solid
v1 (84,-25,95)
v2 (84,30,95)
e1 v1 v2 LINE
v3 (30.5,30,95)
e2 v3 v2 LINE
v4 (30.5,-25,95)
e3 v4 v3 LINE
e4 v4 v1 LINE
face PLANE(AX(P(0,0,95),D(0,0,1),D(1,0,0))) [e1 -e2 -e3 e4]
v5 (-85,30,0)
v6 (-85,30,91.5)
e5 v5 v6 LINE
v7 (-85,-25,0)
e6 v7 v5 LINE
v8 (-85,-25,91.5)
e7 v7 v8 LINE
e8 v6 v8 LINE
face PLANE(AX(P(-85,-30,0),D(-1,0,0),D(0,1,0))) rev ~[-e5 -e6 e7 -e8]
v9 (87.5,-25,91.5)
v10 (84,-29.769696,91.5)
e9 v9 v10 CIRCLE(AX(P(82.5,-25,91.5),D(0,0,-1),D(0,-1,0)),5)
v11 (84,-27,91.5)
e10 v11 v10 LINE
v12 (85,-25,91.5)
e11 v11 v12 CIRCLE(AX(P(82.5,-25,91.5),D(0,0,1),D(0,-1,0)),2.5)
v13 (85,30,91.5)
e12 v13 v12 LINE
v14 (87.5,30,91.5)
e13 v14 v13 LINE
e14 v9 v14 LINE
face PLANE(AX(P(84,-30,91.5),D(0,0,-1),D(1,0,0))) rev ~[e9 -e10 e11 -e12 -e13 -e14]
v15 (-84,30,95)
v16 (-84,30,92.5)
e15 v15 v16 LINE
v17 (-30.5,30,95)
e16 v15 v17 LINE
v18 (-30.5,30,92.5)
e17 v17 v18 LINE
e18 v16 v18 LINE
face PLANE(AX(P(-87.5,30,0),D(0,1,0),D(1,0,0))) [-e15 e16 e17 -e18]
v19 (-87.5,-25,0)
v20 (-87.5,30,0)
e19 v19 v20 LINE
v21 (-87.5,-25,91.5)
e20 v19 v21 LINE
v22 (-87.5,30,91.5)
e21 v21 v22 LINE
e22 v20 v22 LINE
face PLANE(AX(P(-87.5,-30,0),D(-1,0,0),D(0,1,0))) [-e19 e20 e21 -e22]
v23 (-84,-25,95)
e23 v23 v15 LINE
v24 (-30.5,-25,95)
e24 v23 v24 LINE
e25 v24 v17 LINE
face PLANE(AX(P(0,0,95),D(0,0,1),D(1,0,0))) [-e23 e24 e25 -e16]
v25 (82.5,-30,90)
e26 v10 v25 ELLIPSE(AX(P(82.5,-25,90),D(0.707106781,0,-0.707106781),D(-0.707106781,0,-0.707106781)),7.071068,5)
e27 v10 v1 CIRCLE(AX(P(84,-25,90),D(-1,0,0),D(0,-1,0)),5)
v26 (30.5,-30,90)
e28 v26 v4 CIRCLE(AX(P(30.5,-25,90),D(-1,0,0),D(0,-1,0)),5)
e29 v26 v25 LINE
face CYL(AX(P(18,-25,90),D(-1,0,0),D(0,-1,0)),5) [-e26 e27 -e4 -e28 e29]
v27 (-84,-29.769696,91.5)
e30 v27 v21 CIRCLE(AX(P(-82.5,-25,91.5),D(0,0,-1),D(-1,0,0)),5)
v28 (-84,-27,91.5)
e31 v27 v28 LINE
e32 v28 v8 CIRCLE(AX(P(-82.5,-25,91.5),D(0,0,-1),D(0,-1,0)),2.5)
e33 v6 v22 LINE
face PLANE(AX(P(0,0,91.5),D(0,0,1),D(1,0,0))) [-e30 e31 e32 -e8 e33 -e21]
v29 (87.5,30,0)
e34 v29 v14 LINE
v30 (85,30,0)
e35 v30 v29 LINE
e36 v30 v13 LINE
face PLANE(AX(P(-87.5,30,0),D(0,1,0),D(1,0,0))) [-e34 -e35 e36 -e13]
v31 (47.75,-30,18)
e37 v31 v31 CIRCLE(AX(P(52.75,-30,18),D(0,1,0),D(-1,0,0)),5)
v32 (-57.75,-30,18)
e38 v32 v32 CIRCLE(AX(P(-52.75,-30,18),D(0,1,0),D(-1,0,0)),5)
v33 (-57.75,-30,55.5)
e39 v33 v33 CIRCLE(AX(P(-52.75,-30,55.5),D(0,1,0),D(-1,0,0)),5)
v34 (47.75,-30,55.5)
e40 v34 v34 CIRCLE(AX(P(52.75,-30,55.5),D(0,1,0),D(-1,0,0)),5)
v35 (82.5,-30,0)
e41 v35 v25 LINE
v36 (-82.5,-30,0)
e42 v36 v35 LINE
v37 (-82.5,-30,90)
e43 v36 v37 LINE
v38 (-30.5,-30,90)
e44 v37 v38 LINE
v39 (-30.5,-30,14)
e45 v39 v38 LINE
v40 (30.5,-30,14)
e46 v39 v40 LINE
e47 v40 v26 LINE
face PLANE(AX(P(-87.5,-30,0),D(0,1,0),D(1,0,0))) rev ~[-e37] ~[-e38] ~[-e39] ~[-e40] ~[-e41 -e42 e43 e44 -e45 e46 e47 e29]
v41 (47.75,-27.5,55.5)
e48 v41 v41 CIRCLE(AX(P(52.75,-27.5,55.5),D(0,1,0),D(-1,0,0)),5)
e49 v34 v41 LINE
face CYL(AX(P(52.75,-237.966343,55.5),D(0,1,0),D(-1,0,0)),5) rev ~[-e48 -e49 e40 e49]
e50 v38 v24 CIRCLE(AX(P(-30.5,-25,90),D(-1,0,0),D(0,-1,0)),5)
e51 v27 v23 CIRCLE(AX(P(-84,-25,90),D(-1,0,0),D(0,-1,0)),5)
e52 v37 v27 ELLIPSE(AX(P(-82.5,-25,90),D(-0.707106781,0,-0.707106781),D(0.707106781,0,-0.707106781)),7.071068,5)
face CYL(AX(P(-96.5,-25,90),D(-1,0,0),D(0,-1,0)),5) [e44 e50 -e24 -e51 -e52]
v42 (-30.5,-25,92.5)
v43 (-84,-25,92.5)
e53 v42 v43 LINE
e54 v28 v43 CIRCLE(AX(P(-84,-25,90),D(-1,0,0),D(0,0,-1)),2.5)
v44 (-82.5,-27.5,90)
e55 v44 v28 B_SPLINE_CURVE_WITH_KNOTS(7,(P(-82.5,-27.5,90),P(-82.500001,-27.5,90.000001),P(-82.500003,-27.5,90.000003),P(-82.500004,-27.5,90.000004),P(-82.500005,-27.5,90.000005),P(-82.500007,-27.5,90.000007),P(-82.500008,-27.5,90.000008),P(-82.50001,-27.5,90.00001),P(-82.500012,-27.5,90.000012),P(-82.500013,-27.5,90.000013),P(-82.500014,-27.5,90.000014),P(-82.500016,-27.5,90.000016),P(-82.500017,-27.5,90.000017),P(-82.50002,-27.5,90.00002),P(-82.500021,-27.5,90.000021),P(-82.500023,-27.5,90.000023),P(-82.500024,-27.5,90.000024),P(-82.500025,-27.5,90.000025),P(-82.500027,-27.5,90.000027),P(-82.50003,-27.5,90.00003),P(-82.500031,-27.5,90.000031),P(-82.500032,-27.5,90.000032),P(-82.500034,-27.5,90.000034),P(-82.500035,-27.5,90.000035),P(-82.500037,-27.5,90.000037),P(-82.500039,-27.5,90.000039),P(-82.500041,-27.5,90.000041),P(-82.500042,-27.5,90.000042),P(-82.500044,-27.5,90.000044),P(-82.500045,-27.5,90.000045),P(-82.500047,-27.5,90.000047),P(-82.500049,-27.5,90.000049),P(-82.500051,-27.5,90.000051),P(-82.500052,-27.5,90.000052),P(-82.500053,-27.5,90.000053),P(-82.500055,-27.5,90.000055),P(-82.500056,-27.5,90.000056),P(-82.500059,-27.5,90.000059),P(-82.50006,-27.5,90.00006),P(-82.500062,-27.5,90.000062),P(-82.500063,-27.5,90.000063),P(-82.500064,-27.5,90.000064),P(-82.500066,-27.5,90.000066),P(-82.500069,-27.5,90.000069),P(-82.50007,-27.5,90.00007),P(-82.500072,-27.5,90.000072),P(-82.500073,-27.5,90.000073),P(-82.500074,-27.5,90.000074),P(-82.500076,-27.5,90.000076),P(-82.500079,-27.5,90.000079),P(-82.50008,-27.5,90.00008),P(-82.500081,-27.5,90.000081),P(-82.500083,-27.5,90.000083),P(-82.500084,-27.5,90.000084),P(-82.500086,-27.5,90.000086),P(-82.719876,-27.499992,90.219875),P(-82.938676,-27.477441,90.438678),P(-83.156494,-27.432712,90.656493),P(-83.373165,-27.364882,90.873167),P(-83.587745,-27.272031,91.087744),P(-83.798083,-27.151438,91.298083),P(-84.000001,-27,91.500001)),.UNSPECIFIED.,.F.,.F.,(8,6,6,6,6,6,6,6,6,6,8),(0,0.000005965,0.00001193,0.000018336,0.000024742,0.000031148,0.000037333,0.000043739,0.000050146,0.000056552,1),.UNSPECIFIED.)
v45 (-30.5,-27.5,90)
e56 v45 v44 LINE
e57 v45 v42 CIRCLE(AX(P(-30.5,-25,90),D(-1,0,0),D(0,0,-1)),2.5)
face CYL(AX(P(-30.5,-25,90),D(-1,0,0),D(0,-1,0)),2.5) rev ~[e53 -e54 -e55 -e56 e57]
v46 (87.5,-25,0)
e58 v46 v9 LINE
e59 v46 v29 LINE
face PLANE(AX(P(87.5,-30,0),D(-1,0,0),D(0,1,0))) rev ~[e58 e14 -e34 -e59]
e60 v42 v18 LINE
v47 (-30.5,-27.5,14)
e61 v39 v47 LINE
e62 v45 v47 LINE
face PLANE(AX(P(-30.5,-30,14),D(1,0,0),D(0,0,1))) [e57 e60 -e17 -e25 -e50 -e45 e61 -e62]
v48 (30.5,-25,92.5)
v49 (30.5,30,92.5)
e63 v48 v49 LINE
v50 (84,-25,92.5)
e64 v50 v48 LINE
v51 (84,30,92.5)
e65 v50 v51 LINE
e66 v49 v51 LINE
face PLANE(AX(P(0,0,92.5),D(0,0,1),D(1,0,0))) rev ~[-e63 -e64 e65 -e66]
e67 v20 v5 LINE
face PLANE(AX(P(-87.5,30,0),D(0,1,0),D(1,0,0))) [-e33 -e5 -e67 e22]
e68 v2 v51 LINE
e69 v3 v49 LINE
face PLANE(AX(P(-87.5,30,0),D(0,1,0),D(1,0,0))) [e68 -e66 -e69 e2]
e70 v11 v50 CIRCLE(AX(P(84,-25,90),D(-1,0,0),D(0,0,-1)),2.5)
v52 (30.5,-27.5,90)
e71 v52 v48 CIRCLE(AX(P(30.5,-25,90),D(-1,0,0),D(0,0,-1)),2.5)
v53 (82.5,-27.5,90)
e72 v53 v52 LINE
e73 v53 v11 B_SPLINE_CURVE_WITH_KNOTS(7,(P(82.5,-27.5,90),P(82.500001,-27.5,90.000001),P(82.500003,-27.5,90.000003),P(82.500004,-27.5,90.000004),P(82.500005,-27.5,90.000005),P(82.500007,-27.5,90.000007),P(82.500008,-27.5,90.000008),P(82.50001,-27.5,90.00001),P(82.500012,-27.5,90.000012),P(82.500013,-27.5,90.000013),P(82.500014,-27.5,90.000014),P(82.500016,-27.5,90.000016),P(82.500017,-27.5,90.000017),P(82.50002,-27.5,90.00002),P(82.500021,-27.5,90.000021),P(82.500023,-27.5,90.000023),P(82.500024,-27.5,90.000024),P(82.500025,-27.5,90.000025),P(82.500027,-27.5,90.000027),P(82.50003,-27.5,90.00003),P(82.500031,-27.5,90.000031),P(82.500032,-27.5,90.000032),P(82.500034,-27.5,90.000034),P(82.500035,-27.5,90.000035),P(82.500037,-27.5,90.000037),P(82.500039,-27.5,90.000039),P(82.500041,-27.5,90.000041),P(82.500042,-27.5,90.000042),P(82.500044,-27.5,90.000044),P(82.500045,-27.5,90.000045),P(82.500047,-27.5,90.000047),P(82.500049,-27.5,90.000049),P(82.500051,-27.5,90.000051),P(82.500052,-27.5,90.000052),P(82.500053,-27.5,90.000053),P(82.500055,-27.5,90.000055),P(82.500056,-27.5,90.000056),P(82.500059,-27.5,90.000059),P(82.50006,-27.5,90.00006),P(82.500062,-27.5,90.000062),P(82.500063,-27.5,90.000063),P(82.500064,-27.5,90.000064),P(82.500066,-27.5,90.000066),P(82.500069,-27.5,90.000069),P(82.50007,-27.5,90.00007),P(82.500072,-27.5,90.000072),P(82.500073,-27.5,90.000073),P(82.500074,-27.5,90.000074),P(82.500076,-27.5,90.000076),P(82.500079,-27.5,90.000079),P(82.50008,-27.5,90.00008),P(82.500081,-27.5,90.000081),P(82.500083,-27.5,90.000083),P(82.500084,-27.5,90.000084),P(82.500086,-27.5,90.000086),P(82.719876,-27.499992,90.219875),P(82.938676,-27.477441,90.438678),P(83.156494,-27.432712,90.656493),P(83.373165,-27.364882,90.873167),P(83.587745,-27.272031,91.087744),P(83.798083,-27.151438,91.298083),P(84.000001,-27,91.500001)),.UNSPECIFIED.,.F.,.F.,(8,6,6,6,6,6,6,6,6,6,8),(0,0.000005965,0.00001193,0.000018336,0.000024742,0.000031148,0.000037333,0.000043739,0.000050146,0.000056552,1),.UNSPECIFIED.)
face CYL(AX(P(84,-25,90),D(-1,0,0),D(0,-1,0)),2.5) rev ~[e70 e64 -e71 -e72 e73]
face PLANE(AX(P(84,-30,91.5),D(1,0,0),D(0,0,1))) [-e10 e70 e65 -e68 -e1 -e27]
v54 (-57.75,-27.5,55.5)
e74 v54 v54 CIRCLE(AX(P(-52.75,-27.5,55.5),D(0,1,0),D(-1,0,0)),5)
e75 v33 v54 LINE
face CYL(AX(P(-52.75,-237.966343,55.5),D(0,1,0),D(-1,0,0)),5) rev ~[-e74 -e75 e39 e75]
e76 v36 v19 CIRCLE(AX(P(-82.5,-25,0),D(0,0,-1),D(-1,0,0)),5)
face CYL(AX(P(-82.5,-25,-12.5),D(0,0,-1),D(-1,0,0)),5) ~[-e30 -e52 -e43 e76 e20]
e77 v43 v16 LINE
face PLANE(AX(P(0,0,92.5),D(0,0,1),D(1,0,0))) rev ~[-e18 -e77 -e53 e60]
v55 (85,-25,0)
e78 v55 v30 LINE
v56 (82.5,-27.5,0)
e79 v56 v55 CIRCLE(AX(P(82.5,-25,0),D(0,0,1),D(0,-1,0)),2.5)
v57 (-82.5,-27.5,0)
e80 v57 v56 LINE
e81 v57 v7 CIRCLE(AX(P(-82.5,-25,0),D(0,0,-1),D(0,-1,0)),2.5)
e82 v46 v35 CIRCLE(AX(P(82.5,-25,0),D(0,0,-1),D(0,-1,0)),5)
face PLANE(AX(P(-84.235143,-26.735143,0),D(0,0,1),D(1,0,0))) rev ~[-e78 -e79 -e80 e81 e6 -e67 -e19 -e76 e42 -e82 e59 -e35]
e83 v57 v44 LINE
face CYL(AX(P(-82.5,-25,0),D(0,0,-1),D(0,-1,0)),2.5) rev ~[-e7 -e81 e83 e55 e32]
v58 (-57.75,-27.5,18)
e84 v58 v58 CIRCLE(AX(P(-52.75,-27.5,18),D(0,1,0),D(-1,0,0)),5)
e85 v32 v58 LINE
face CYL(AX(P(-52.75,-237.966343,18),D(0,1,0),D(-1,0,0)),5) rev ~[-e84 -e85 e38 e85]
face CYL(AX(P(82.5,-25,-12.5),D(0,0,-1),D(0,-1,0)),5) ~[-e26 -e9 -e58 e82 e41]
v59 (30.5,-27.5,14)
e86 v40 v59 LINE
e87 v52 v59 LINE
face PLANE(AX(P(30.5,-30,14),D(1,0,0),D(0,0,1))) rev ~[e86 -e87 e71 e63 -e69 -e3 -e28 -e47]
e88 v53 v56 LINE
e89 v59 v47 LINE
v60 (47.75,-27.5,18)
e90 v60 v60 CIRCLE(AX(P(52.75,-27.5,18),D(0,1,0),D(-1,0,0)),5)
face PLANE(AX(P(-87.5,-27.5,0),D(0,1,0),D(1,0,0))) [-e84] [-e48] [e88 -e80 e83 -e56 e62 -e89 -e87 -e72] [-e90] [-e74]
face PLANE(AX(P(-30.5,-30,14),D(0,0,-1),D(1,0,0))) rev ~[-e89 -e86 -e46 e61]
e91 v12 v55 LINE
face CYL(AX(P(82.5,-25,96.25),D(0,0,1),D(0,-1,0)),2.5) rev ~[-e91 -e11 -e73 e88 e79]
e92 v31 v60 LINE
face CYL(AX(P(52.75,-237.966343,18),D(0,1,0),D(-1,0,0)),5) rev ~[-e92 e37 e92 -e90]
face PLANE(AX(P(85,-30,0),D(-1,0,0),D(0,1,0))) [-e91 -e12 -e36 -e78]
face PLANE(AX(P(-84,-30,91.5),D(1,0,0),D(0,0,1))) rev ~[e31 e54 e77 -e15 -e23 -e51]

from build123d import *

# Parameters (mm, degrees)
F0_W         = 175
F0_H         = 60
F1_DEPTH     = 95
F3_T         = -2.5
F2_W         = 61
F2_H         = 81
F4_DEPTH     = 60.001
F6_D         = 10
F7_W         = 3.5
F7_H         = 3.5
F8_DEPTH     = 60.001
F9_T1_DEPTH  = 116.5
F9_T3_DEPTH  = 78.5
F9_T5_DEPTH  = 78.5
F10_R        = 2.5
F11_T4_DEPTH = 96.25
F12_R        = 2.5
F13_T4_DEPTH = 96.25


# Not quite as in the source:
# - a fillet or chamfer that OpenCascade refuses, or shapes differently, is made with other operations: its cross-section is extruded or revolved along the edge and cut away or added


with BuildPart() as f1:
    # F0 (on Top) → F1 (new body)
    with BuildSketch(Plane.XY):
        Rectangle(F0_W, F0_H)
    extrude(amount=F1_DEPTH)

    # F3
    f3_openings = [f1.faces().sort_by_distance(p)[0] for p in [
        (0, 30, 47.5),
        (0, 0, 0),
    ]]
    offset(amount=F3_T, openings=f3_openings)

    # F2 (on face) → F4 (cut, through all)
    with BuildSketch(Plane.XZ.offset(30)):
        with Locations((0, 54.5)):
            Rectangle(F2_W, F2_H)
    extrude(amount=-F4_DEPTH, mode=Mode.SUBTRACT)

    # F6 (through all)
    with Locations(Plane.XZ.offset(30)):
        with Locations((52.75, 55.5), (52.75, 18), (-52.75, 18), (-52.75, 55.5)):
            Hole(F6_D / 2)

    # F7 (on face) → F8 (cut, through all)
    with BuildSketch(Plane.XZ.offset(30)):
        with Locations((-85.75, 93.25)):
            Rectangle(F7_W, F7_H)
        with Locations((85.75, 93.25)):
            Rectangle(F7_W, F7_H)
    extrude(amount=-F8_DEPTH, mode=Mode.SUBTRACT)

    # F9: fillet of radius 5 on 4 edges, made by hand

    # F9_s2 → F9_t1 (cut)
    with BuildSketch(Plane.XY.offset(-12.5)):
        with BuildLine():
            ThreePointArc((-87.5, -25), (-86.0355339059, -28.5355339059), (-82.5, -30))
            Line((-82.5, -30), (-87.5, -30))
            Line((-87.5, -30), (-87.5, -25))
        make_face()
        with BuildLine():
            ThreePointArc((82.5, -30), (86.0355339059, -28.5355339059), (87.5, -25))
            Line((87.5, -25), (87.5, -30))
            Line((87.5, -30), (82.5, -30))
        make_face()
    extrude(amount=F9_T1_DEPTH, mode=Mode.SUBTRACT)

    # F9_s4 → F9_t3 (cut)
    with BuildSketch(Plane.YZ.offset(-96.5)):
        with BuildLine():
            ThreePointArc((-30, 90), (-28.5355339059, 93.5355339059), (-25, 95))
            Line((-25, 95), (-30, 95))
            Line((-30, 95), (-30, 90))
        make_face()
    extrude(amount=F9_T3_DEPTH, mode=Mode.SUBTRACT)

    # F9_s6 → F9_t5 (cut)
    with BuildSketch(Plane.YZ.offset(18)):
        with BuildLine():
            ThreePointArc((-30, 90), (-28.5355339059, 93.5355339059), (-25, 95))
            Line((-25, 95), (-30, 95))
            Line((-30, 95), (-30, 90))
        make_face()
    extrude(amount=F9_T5_DEPTH, mode=Mode.SUBTRACT)

    # F10
    f10_edges = [f1.edges().sort_by_distance(p)[0] for p in [
        (57.25, -27.5, 92.5),
    ]]
    fillet(f10_edges, radius=F10_R)

    # F11: fillet of radius 2.5 on 1 edges, made by hand


with BuildPart() as f11_tool2:
    # F11_s3 → F11_t4 (new body)
    with BuildSketch(Plane.XY.offset(96.25)):
        with BuildLine():
            ThreePointArc((82.5, -27.5), (84.267766953, -26.767766953), (85, -25))
            Line((85, -25), (85, -27.5))
            Line((85, -27.5), (82.5, -27.5))
        make_face()
    extrude(amount=-F11_T4_DEPTH)

    split(bisect_by=Plane.XY.offset(91.5), keep=Keep.BOTTOM)


with BuildPart() as f1_1:
    add(f1.part)

    # F11_t1: union F11_tool2
    add(f11_tool2.part)

    # F12
    f12_edges = [f1_1.edges().sort_by_distance(p)[0] for p in [
        (-57.25, -27.5, 92.5),
    ]]
    fillet(f12_edges, radius=F12_R)

    # F13: fillet of radius 2.5 on 1 edges, made by hand


with BuildPart() as f13_tool2:
    # F13_s3 → F13_t4 (new body)
    with BuildSketch(Plane.XY):
        with BuildLine():
            ThreePointArc((-82.5, -27.5), (-84.267766953, -26.767766953), (-85, -25))
            Line((-85, -25), (-85, -27.5))
            Line((-85, -27.5), (-82.5, -27.5))
        make_face()
    extrude(amount=F13_T4_DEPTH)

    split(bisect_by=Plane.XY.offset(91.5), keep=Keep.BOTTOM)


with BuildPart() as f1_2:
    add(f1_1.part)

    # F13_t1: union F13_tool2
    add(f13_tool2.part)


solid = f1_2.part
